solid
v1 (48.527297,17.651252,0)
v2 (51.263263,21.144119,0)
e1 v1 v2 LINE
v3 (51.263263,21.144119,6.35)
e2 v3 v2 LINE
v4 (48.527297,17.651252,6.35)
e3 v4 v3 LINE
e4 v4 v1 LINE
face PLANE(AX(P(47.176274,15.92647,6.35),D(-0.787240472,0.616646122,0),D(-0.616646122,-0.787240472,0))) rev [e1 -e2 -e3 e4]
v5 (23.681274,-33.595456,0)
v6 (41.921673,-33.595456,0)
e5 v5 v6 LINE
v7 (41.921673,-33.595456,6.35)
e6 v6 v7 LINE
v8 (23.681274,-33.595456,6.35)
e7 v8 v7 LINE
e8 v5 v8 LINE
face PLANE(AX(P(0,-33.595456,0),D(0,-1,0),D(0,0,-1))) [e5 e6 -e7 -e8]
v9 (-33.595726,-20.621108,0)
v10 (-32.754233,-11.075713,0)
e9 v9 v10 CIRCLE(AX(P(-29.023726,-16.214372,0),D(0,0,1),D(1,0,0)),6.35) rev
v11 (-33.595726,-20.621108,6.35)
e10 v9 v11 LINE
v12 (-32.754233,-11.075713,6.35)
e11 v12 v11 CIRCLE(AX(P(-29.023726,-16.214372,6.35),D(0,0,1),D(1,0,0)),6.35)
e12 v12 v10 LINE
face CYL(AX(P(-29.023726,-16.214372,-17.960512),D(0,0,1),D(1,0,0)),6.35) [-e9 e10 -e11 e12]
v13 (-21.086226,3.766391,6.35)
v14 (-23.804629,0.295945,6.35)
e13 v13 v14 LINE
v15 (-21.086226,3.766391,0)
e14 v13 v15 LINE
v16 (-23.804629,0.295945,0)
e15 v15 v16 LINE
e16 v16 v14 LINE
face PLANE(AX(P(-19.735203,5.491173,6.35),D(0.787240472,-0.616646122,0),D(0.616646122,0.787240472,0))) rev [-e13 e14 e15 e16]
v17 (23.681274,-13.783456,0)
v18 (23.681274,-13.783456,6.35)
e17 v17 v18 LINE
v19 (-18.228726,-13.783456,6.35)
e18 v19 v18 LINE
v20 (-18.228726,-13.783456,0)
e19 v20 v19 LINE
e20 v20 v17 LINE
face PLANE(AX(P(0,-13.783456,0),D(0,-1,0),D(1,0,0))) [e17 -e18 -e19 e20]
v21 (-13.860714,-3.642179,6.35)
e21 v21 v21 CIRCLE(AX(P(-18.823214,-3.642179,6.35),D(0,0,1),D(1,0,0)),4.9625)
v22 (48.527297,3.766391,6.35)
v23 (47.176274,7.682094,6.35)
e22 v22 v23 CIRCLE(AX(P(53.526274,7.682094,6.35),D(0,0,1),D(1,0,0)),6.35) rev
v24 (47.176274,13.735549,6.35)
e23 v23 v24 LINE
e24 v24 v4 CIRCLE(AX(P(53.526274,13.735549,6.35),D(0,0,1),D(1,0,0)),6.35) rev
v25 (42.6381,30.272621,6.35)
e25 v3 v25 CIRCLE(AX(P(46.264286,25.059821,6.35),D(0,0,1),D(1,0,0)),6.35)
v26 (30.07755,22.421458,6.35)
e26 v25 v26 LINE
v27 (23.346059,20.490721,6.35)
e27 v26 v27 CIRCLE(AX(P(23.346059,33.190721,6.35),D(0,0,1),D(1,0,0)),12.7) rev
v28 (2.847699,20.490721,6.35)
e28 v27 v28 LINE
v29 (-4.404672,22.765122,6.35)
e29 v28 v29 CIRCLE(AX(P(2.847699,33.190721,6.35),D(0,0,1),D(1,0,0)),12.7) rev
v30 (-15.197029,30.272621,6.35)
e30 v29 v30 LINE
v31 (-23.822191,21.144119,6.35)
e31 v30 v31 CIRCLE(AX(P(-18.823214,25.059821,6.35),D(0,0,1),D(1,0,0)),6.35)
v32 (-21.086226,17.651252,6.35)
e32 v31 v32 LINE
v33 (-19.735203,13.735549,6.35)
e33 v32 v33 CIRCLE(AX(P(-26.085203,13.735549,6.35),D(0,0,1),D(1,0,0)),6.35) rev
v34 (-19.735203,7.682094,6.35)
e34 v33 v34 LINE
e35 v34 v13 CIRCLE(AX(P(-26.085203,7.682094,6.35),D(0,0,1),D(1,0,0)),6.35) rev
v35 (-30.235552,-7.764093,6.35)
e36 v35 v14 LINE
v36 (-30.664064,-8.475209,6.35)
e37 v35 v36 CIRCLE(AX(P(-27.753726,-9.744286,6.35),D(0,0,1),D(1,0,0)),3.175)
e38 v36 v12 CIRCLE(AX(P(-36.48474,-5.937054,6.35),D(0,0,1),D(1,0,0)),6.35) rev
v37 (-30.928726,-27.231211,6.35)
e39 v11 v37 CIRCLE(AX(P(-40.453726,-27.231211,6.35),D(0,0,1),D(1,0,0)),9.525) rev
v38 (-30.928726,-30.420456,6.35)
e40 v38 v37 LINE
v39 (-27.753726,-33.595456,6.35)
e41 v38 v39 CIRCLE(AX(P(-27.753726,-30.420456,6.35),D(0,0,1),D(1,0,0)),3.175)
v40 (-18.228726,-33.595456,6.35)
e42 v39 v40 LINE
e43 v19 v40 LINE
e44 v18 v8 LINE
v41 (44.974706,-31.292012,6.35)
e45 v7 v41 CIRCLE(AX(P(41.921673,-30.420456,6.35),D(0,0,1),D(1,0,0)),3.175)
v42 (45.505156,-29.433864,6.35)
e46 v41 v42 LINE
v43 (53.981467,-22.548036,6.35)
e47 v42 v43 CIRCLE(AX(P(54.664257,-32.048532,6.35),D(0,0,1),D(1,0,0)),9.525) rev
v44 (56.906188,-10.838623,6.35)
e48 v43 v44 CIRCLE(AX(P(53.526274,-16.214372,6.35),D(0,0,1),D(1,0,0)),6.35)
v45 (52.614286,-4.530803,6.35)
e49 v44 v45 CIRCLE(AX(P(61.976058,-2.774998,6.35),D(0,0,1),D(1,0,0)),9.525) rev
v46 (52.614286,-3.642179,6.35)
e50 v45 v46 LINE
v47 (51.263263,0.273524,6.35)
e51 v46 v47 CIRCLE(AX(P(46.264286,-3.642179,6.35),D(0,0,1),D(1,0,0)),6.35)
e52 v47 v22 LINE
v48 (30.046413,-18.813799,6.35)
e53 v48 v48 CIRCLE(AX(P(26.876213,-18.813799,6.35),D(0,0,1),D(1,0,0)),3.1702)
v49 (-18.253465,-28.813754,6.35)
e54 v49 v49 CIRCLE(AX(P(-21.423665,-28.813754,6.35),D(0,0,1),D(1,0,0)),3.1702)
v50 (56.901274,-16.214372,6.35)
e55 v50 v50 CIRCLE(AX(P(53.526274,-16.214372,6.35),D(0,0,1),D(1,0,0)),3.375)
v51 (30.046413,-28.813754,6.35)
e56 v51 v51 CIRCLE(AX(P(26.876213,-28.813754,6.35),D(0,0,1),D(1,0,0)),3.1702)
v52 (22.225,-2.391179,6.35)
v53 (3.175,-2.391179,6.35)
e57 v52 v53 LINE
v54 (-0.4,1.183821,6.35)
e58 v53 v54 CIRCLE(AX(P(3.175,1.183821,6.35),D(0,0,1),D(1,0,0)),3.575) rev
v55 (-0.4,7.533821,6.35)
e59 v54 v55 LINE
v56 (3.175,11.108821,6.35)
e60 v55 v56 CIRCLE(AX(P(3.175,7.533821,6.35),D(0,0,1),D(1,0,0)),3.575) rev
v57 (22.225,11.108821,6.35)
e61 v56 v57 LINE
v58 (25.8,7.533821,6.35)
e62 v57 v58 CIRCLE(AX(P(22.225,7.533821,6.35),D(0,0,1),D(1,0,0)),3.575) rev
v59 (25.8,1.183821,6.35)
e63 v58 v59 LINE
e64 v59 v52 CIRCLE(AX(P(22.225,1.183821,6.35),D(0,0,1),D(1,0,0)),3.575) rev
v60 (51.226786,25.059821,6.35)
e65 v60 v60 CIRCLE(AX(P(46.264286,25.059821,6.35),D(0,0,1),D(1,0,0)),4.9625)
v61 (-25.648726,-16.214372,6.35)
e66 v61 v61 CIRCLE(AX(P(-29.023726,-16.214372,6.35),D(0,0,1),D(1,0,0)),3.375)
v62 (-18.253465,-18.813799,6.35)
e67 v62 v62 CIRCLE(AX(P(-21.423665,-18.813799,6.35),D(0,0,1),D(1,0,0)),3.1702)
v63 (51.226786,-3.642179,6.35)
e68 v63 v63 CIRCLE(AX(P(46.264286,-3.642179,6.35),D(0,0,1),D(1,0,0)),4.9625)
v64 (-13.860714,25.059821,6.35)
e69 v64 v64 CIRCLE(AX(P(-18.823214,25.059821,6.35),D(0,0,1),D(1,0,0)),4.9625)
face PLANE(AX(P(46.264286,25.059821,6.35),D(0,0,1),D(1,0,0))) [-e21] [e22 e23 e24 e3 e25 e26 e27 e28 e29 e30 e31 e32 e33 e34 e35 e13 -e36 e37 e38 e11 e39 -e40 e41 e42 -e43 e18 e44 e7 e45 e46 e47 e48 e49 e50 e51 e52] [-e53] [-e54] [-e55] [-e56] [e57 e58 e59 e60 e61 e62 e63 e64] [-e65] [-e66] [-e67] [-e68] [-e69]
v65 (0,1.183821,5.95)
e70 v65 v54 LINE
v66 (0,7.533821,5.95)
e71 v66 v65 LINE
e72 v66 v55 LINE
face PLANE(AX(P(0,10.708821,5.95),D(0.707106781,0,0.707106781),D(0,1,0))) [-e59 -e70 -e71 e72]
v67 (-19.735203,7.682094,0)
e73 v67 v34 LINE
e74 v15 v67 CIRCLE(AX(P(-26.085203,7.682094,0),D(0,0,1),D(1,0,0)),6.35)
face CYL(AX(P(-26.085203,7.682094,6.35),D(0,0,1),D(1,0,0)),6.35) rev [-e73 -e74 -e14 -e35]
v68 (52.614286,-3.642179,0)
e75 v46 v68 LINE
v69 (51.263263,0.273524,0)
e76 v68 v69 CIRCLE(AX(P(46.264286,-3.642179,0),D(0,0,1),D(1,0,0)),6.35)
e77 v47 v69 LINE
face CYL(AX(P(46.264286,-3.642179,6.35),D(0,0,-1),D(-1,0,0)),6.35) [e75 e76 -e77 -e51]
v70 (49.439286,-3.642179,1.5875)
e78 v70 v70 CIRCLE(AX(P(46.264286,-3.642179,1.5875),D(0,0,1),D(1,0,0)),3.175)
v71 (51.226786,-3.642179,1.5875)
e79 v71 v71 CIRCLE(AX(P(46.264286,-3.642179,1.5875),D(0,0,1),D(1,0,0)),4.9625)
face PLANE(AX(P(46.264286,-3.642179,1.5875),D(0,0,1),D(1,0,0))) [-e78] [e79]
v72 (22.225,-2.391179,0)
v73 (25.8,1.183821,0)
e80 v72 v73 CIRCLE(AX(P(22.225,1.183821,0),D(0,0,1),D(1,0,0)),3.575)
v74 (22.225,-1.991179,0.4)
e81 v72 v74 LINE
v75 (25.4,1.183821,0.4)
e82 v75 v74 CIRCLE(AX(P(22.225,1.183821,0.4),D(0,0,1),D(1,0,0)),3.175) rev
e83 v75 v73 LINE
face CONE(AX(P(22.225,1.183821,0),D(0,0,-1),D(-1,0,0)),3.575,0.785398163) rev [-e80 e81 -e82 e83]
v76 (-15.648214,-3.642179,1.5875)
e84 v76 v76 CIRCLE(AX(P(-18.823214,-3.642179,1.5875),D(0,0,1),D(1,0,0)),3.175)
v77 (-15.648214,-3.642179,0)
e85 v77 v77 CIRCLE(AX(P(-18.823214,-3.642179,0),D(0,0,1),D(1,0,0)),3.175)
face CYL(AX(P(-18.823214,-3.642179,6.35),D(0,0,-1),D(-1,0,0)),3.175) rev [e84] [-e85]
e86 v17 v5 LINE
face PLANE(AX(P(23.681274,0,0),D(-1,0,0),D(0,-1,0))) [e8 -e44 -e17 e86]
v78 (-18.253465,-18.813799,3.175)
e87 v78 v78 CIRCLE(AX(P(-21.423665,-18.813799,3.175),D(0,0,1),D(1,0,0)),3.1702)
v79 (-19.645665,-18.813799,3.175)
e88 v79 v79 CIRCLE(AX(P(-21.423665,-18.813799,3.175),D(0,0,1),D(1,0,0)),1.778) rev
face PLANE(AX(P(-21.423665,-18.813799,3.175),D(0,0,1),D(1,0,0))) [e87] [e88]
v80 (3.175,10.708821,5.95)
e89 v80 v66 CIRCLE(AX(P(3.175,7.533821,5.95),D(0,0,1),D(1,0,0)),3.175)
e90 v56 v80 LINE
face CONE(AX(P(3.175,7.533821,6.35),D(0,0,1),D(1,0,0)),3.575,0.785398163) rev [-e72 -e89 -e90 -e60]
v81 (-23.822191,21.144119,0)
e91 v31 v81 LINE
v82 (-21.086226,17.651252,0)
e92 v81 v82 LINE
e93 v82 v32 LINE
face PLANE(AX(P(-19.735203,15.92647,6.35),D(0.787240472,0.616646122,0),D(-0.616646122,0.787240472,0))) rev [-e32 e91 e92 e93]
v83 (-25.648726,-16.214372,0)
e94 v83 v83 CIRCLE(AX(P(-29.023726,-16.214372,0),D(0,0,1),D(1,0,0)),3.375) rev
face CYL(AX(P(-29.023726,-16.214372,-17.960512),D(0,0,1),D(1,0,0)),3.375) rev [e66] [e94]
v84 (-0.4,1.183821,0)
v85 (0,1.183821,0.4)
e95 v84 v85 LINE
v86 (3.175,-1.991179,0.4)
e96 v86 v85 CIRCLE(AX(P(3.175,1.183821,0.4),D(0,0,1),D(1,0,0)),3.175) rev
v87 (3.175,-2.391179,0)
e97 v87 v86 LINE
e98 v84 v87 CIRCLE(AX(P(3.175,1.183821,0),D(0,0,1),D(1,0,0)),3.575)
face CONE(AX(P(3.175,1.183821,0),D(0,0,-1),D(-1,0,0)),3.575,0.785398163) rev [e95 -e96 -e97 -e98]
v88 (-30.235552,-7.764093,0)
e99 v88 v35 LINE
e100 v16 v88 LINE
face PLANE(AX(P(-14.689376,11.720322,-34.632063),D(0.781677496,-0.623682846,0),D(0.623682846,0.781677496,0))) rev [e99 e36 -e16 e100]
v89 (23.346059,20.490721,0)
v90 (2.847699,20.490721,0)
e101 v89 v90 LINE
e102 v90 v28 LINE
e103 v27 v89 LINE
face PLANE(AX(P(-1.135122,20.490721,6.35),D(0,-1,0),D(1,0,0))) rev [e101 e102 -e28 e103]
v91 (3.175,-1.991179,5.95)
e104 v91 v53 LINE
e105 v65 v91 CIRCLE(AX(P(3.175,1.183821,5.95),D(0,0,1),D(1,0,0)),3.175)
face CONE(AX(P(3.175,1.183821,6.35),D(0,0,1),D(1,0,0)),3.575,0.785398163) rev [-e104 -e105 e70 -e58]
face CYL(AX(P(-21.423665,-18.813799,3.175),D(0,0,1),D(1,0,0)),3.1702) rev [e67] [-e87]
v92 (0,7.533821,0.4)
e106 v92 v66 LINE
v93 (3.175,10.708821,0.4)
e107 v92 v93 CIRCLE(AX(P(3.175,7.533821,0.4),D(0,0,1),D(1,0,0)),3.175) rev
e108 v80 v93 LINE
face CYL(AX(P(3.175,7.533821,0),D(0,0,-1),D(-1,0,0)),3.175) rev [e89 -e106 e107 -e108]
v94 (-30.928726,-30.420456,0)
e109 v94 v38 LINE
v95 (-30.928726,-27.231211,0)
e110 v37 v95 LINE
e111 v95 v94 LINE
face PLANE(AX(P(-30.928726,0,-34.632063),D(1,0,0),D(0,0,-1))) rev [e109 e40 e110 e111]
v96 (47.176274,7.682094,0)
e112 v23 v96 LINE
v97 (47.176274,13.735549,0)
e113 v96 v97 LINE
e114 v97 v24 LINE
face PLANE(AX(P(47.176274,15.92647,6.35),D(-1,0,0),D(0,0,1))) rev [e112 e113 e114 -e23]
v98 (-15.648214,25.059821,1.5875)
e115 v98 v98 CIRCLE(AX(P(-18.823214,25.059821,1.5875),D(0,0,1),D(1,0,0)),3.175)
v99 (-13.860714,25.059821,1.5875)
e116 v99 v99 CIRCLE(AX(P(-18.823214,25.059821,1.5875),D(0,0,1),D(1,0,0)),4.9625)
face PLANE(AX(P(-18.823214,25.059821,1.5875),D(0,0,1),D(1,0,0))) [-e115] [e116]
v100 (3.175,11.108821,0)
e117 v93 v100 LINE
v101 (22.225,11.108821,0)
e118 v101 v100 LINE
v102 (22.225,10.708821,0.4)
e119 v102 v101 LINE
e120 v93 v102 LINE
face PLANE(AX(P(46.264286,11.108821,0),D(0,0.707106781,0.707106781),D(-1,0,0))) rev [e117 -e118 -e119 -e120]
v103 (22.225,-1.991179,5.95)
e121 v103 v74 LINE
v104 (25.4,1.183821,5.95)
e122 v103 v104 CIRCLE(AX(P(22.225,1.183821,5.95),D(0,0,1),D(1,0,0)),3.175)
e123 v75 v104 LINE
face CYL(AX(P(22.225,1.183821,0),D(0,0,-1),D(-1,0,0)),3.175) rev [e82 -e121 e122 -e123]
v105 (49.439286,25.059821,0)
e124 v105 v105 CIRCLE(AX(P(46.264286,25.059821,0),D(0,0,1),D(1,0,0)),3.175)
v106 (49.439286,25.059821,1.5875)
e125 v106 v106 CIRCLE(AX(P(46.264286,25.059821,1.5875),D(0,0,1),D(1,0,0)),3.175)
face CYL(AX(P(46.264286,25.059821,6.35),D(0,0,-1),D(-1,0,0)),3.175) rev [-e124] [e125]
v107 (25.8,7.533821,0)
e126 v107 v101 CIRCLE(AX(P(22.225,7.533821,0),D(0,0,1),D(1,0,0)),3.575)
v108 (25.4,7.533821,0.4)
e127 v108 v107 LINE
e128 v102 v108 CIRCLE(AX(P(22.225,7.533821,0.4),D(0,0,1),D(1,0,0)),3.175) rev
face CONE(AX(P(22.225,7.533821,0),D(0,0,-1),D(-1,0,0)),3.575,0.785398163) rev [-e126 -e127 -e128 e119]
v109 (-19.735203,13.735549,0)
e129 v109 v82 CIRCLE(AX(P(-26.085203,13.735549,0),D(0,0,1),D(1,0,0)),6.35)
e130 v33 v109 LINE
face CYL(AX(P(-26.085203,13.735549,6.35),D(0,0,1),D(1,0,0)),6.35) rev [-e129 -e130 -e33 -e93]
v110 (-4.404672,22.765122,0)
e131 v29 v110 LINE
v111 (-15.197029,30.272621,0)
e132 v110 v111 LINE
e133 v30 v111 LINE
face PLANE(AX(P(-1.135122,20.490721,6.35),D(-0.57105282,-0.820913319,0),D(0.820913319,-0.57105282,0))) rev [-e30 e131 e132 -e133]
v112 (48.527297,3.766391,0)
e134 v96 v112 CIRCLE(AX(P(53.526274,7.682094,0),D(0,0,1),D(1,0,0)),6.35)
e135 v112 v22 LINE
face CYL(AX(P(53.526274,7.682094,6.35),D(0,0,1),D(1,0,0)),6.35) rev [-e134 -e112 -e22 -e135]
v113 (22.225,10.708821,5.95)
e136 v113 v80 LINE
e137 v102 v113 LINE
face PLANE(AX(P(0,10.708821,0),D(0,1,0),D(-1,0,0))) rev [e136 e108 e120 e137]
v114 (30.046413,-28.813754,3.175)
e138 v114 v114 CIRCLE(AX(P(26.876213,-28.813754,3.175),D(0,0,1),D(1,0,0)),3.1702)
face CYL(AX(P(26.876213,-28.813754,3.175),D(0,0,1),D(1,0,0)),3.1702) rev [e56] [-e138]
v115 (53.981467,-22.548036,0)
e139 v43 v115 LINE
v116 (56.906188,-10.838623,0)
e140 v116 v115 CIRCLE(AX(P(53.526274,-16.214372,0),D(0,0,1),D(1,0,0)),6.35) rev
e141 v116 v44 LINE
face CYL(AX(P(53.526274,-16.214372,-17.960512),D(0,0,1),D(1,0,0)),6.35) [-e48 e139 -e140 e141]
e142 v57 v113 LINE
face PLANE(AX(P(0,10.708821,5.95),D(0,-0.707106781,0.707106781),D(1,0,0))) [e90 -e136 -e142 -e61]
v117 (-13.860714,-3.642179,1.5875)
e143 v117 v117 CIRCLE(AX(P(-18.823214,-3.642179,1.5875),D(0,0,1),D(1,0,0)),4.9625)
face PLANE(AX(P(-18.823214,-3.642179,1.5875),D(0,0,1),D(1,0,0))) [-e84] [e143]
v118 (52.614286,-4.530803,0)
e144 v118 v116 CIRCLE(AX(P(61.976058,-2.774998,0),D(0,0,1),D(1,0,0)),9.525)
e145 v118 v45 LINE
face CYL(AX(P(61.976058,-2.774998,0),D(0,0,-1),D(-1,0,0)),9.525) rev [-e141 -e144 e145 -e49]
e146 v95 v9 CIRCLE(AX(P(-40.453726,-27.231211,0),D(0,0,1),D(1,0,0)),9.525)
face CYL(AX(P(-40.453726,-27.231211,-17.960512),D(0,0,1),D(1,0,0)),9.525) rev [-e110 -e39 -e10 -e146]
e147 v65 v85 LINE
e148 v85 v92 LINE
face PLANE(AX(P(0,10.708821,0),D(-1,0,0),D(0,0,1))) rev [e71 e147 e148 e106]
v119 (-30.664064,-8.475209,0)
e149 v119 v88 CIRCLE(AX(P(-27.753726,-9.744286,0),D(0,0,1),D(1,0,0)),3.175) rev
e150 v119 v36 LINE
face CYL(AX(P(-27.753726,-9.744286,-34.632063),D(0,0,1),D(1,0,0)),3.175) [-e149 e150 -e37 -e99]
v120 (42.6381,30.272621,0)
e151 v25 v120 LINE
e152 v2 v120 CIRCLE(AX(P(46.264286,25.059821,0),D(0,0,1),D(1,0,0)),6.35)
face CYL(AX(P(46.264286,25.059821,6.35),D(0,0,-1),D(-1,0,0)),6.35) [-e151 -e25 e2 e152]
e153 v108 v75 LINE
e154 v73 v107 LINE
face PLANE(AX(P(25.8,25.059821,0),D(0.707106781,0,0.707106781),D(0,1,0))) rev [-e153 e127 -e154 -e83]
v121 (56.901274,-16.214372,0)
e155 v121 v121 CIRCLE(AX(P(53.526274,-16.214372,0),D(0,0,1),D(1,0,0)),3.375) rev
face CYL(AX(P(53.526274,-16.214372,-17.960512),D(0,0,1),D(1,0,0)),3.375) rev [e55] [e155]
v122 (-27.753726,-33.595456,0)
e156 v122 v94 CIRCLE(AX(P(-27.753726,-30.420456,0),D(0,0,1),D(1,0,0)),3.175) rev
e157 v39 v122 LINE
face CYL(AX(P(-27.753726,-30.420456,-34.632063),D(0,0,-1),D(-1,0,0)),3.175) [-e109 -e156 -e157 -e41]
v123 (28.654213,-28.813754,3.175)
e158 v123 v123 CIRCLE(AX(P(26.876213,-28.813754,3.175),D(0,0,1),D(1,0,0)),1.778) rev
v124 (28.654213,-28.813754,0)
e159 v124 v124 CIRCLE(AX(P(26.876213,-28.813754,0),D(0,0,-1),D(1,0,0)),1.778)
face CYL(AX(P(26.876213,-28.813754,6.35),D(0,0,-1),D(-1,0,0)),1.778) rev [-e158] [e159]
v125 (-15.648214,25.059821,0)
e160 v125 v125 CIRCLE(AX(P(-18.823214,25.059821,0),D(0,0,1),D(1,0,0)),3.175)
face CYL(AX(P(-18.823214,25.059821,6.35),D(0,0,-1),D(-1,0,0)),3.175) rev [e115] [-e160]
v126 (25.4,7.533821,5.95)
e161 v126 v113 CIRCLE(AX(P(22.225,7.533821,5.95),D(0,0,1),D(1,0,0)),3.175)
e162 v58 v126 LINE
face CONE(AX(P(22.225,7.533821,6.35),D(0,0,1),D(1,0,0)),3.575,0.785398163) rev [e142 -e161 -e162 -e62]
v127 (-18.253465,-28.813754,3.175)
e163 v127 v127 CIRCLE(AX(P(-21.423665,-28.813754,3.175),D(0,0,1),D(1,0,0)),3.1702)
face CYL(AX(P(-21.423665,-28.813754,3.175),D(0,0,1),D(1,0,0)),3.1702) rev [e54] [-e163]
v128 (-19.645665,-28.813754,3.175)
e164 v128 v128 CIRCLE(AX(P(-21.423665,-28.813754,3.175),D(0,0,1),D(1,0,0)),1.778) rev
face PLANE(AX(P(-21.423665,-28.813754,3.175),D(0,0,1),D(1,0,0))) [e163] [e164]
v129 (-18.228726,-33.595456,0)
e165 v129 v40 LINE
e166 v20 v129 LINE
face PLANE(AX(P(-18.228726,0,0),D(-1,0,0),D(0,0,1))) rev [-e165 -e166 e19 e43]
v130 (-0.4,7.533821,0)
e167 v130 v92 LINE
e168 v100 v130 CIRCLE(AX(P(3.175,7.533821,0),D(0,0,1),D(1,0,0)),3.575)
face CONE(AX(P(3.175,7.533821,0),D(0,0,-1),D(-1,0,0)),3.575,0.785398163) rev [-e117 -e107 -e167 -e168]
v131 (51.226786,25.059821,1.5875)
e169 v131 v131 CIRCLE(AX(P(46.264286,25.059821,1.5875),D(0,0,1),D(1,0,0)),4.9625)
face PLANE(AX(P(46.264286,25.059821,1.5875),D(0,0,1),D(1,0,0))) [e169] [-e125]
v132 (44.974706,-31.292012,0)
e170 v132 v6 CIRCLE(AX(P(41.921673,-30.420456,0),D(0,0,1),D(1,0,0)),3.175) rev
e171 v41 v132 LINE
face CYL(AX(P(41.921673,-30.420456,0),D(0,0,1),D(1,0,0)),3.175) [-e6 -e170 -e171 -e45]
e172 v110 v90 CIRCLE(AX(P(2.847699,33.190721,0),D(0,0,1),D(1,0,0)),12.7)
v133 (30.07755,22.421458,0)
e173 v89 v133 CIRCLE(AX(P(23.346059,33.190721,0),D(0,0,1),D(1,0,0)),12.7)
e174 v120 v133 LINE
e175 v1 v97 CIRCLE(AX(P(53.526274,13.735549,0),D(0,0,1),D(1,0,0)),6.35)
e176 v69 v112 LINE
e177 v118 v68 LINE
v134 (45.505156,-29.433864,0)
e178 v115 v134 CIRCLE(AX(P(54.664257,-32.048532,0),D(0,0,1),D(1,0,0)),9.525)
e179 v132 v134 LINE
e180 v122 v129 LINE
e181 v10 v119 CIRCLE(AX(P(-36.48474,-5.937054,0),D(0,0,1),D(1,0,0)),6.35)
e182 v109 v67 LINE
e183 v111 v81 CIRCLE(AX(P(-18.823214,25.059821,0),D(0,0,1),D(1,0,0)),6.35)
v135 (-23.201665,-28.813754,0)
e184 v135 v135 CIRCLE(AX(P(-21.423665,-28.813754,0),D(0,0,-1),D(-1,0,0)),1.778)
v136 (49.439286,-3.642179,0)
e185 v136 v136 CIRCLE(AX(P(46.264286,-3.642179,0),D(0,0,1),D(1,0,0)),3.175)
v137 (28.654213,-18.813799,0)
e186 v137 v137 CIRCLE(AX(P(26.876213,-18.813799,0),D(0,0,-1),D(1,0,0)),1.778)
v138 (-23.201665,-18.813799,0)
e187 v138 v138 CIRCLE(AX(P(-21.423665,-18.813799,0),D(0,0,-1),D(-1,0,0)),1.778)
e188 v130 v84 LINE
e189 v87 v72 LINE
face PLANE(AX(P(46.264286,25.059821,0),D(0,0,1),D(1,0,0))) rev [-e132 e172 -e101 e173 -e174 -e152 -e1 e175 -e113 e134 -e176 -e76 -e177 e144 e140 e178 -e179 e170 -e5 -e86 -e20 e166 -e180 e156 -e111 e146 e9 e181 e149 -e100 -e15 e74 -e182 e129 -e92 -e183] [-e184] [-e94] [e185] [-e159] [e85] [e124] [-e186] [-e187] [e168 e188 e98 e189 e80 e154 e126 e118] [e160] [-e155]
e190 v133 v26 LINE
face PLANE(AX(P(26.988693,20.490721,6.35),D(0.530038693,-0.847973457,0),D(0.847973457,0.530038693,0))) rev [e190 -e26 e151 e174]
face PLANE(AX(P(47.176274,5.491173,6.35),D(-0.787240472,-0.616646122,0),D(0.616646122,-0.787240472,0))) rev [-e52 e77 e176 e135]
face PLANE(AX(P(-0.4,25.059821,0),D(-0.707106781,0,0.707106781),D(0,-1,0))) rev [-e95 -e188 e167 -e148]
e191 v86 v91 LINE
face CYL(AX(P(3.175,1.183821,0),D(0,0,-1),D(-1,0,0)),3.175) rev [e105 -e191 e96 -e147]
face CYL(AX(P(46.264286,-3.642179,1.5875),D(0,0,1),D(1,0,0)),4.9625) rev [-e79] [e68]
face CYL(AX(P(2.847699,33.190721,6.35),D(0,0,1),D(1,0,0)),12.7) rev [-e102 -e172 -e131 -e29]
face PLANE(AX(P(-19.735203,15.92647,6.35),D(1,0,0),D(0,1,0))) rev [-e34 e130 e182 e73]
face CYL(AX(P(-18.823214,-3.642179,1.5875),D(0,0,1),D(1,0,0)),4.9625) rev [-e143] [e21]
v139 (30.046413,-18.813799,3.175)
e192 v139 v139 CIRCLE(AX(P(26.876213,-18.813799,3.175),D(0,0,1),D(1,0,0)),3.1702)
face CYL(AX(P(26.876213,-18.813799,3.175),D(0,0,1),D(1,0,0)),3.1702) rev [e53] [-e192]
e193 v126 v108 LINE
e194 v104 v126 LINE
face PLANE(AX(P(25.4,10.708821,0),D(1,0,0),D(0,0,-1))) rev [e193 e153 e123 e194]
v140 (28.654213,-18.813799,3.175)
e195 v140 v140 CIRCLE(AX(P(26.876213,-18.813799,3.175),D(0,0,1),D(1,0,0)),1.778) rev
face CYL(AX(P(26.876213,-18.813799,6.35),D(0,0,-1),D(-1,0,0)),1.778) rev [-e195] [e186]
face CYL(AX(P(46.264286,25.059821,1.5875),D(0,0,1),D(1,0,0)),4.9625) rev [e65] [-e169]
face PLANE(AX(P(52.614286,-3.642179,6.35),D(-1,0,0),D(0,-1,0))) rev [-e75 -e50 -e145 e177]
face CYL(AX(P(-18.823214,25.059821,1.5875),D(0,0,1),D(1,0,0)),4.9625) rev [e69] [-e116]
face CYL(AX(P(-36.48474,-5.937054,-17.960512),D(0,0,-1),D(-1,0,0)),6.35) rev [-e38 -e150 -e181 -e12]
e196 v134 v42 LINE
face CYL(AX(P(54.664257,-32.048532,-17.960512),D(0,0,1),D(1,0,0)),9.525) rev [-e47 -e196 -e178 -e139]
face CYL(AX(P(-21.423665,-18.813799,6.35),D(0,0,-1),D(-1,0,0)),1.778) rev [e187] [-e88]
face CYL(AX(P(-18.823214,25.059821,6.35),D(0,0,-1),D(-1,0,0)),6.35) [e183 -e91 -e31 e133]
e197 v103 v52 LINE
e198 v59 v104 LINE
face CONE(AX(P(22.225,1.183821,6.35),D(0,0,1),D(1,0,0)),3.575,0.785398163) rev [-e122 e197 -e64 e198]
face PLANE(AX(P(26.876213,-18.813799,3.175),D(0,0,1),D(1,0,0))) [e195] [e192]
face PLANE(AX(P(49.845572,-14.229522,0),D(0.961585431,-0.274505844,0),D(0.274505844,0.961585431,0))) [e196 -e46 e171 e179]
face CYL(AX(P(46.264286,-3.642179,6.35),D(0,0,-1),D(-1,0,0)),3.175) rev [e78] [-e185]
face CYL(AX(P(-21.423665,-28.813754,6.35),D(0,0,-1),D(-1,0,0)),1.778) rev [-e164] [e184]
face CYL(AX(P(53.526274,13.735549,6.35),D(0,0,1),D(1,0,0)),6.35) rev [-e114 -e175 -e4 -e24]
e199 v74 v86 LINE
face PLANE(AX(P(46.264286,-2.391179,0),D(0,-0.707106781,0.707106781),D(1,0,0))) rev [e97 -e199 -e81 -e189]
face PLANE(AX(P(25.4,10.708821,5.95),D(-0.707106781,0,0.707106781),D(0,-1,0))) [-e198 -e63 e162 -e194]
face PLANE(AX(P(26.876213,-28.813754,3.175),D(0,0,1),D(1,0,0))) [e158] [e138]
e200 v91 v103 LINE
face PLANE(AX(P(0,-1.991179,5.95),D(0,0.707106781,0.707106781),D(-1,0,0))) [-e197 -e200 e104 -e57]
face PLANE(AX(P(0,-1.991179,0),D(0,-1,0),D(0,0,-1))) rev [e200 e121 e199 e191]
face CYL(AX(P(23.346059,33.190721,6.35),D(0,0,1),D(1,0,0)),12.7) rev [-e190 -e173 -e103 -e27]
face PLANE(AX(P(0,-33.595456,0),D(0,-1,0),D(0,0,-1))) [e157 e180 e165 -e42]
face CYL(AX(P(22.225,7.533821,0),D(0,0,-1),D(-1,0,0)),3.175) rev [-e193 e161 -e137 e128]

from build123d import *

# Parameters (mm, degrees)
SKETCH1_R           = 3.175
BOSS_EXTRUDE1_DEPTH = 6.35
FILLET1_R           = 6.35
FILLET2_R           = 12.7
SKETCH2_R           = 4.9625
CUT_EXTRUDE1_DEPTH  = 4.7625
SKETCH5_R           = 1.778
CUT_EXTRUDE3_DEPTH  = 66.013999766
CUT_EXTRUDE15_DEPTH = 66.013999766
SKETCH11_R          = 3.1702
CUT_EXTRUDE16_DEPTH = 3.175
BOSS_EXTRUDE2_START = -6.35
BOSS_EXTRUDE2_DEPTH = 6.35
SKETCH12_W          = 25.4
SKETCH12_H          = 12.7
CUT_EXTRUDE17_DEPTH = 63.747431864
FILLET14_R          = 3.175
CHAMFER4_SIZE       = 0.4
FILLET16_R          = 3.175
FILLET17_R          = 3.175
SKETCH16_R          = 3.375
BOSS_EXTRUDE4_DEPTH = 6.35
SKETCH17_R          = 3.375
CUT_EXTRUDE19_DEPTH = 69.950310788
FILLET19_R          = 6.35
FILLET20_R          = 9.525


with BuildPart() as part:
    # Sketch1 → Boss-Extrude1 (new body)
    with BuildSketch(Plane.XY):
        with BuildLine():
            Line((-19.735202783, 15.926469991), (-23.822191281, 21.144118554))
            ThreePointArc((-23.822191281, 21.144118554), (-23.438788835, 29.420896018), (-15.197028879, 30.272621002))
            Line((-15.197028879, 30.272621002), (-1.135121582, 20.490721215))
            Line((-1.135121582, 20.490721215), (26.988693011, 20.490721215))
            Line((26.988693011, 20.490721215), (42.638100307, 30.272621002))
            ThreePointArc((42.638100307, 30.272621002), (50.879860264, 29.420896018), (51.263262709, 21.144118554))
            Line((51.263262709, 21.144118554), (47.176274212, 15.926469991))
            Line((47.176274212, 15.926469991), (47.176274212, 5.491172866))
            Line((47.176274212, 5.491172866), (51.263262709, 0.273524304))
            ThreePointArc((51.263262709, 0.273524304), (52.267035248, -1.571068231), (52.614285714, -3.642178571))
            Line((52.614285714, -3.642178571), (52.614285714, -37.65945571))
            Line((52.614285714, -37.65945571), (-25.173214286, -37.65945571))
            Line((-25.173214286, -37.65945571), (-25.173214286, -3.642178571))
            ThreePointArc((-25.173214286, -3.642178571), (-24.825963819, -1.571068231), (-23.822191281, 0.273524304))
            Line((-23.822191281, 0.273524304), (-19.735202783, 5.491172866))
            Line((-19.735202783, 5.491172866), (-19.735202783, 15.926469991))
        make_face()
        with Locations((-18.823214286, 25.059821429)):
            Circle(SKETCH1_R, mode=Mode.SUBTRACT)
        with Locations((46.264285714, 25.059821429)):
            Circle(SKETCH1_R, mode=Mode.SUBTRACT)
        with Locations((46.264285714, -3.642178571)):
            Circle(SKETCH1_R, mode=Mode.SUBTRACT)
        with Locations((-18.823214286, -3.642178571)):
            Circle(SKETCH1_R, mode=Mode.SUBTRACT)
    extrude(amount=BOSS_EXTRUDE1_DEPTH)

    # Fillet1
    fillet1_edges = [part.edges().sort_by_distance(p)[0] for p in [
        (47.176274212, 15.926469991, 3.175),
        (47.176274212, 5.491172866, 3.175),
        (-19.735202783, 5.491172866, 3.175),
        (-19.735202783, 15.926469991, 3.175),
    ]]
    fillet(fillet1_edges, radius=FILLET1_R)

    # Fillet2
    fillet2_edges = [part.edges().sort_by_distance(p)[0] for p in [
        (-1.135121582, 20.490721215, 3.175),
        (26.988693011, 20.490721215, 3.175),
    ]]
    fillet(fillet2_edges, radius=FILLET2_R)

    # Sketch2 → Cut-Extrude1 (cut)
    with BuildSketch(Plane.XY.offset(6.35)):
        with Locations((-18.823214286, 25.059821429)):
            Circle(SKETCH2_R)
        with Locations((-18.823214286, -3.642178571)):
            Circle(SKETCH2_R)
        with Locations((46.264285714, -3.642178571)):
            Circle(SKETCH2_R)
        with Locations((46.264285714, 25.059821429)):
            Circle(SKETCH2_R)
    extrude(amount=-CUT_EXTRUDE1_DEPTH, mode=Mode.SUBTRACT)

    # Sketch5 → Cut-Extrude3 (cut, through all)
    with BuildSketch(Plane(origin=(0, 0, 0), x_dir=(-1, 0, 0), z_dir=(0, 0, -1))):
        with Locations((21.423664788, -18.813799362)):
            Circle(SKETCH5_R)
        with Locations((21.423664788, -28.813754296)):
            Circle(SKETCH5_R)
        with Locations(Location((-26.876213212, -28.813754296, 0), (0, 0, 180))):
            Circle(SKETCH5_R)
        with Locations(Location((-26.876213212, -18.813799362, 0), (0, 0, 180))):
            Circle(SKETCH5_R)
    extrude(amount=-CUT_EXTRUDE3_DEPTH, mode=Mode.SUBTRACT)

    # Sketch6 → Cut-Extrude15 (cut, through all)
    with BuildSketch(Plane.XY.offset(6.35)):
        Polygon((-18.228725788, -33.59545571), (-25.173214286, -33.59545571), (-25.173214286, -37.65945571), (-17.553214286, -37.65945571), (-8.028214286, -37.65945571), (33.881785714, -37.65945571), (43.406785714, -37.65945571), (51.026785714, -37.65945571), (52.614285714, -37.65945571), (52.614285714, -4.530802681), (52.3703532, -5.385290691), (44.317137236, -33.59545571), (23.681274212, -33.59545571), (23.681274212, -13.78345571), (-18.228725788, -13.78345571), align=None)
    extrude(amount=-CUT_EXTRUDE15_DEPTH, mode=Mode.SUBTRACT)

    # Sketch11 → Cut-Extrude16 (cut)
    with BuildSketch(Plane.XY.offset(6.35)):
        with Locations((-21.423664788, -18.813799362)):
            Circle(SKETCH11_R)
        with Locations((-21.423664788, -28.813754296)):
            Circle(SKETCH11_R)
        with Locations((26.876213212, -28.813754296)):
            Circle(SKETCH11_R)
        with Locations((26.876213212, -18.813799362)):
            Circle(SKETCH11_R)
    extrude(amount=-CUT_EXTRUDE16_DEPTH, mode=Mode.SUBTRACT)

    # Sketch13 → Boss-Extrude2 (add)
    with BuildSketch(Plane.XY.offset(6.35).offset(BOSS_EXTRUDE2_START)):
        with BuildLine():
            Line((-30.928725788, -33.59545571), (-25.173214286, -33.59545571))
            Line((-25.173214286, -33.59545571), (-25.173214286, -3.642178571))
            ThreePointArc((-25.173214286, -3.642178571), (-24.825963819, -1.571068231), (-23.822191281, 0.273524304))
            Line((-23.822191281, 0.273524304), (-23.804629036, 0.295945121))
            Line((-23.804629036, 0.295945121), (-30.928725788, -8.632865637))
            Line((-30.928725788, -8.632865637), (-30.928725788, -33.59545571))
        make_face()
    extrude(amount=BOSS_EXTRUDE2_DEPTH)

    # Sketch12 → Cut-Extrude17 (cut, through all)
    with BuildSketch(Plane.XY.offset(6.35)):
        with Locations((12.7, 4.358821429)):
            Rectangle(SKETCH12_W, SKETCH12_H)
    extrude(amount=-CUT_EXTRUDE17_DEPTH, mode=Mode.SUBTRACT)

    # Fillet14
    fillet14_edges = [part.edges().sort_by_distance(p)[0] for p in [
        (0, -1.991178571, 3.175),
        (0, 10.708821429, 3.175),
        (25.4, 10.708821429, 3.175),
        (25.4, -1.991178571, 3.175),
    ]]
    fillet(fillet14_edges, radius=FILLET14_R)

    # Chamfer4
    chamfer4_edges = [part.edges().sort_by_distance(p)[0] for p in [
        (12.7, 10.708821429, 6.35),
        (12.7, 10.708821429, 0),
        (25.4, 4.358821429, 6.35),
        (25.4, 4.358821429, 0),
        (0, 4.358821429, 6.35),
        (0, 4.358821429, 0),
        (12.7, -1.991178571, 6.35),
        (12.7, -1.991178571, 0),
        (24.47006403, 9.778885459, 6.35),
        (24.47006403, 9.778885459, 0),
        (0.92993597, 9.778885459, 6.35),
        (0.92993597, 9.778885459, 0),
        (0.92993597, -1.061242602, 6.35),
        (0.92993597, -1.061242602, 0),
        (24.47006403, -1.061242602, 6.35),
        (24.47006403, -1.061242602, 0),
    ]]
    chamfer(chamfer4_edges, length=CHAMFER4_SIZE)

    # Fillet16
    fillet16_edges = [part.edges().sort_by_distance(p)[0] for p in [
        (-30.928725788, -33.59545571, 3.175),
        (-30.928725788, -8.632865637, 3.175),
    ]]
    fillet(fillet16_edges, radius=FILLET16_R)

    # Fillet17
    fillet17_edges = [part.edges().sort_by_distance(p)[0] for p in [
        (44.317137236, -33.59545571, 3.175),
    ]]
    fillet(fillet17_edges, radius=FILLET17_R)

    # Sketch16 → Boss-Extrude4 (add)
    # profile 1 of 2: a face of its own
    with BuildSketch(Plane.XY.offset(6.35)):
        with BuildLine():
            Line((53.526274212, -9.864372385), (51.091700197, -9.864372385))
            Line((51.091700197, -9.864372385), (50.933736593, -10.417713977))
            ThreePointArc((50.933736593, -10.417713977), (47.420206722, -14.471260278), (48.26426853, -19.768777567))
            Line((48.26426853, -19.768777567), (47.466204116, -22.564372385))
            Line((47.466204116, -22.564372385), (53.526274212, -22.564372385))
            ThreePointArc((53.526274212, -22.564372385), (59.876274212, -16.214372385), (53.526274212, -9.864372385))
        make_face()
        with Locations((53.526274212, -16.214372385)):
            Circle(SKETCH16_R, mode=Mode.SUBTRACT)
    # profile 2 of 2: a face of its own
    with BuildSketch(Plane.XY.offset(6.35)):
        with BuildLine():
            ThreePointArc((-22.681328216, -15.903739098), (-35.032010869, -14.159375941), (-24.200053563, -20.344104369))
            ThreePointArc((-24.200053563, -20.344104369), (-24.423265633, -17.787854523), (-22.681328216, -15.903739098))
        make_face()
        with Locations((-29.023725788, -16.214372385)):
            Circle(SKETCH16_R, mode=Mode.SUBTRACT)
    extrude(amount=-BOSS_EXTRUDE4_DEPTH)

    # Sketch17 → Cut-Extrude19 (cut, through all)
    with BuildSketch(Plane.XY.offset(6.35)):
        with Locations((-29.023725788, -16.214372385)):
            Circle(SKETCH17_R)
    extrude(amount=-CUT_EXTRUDE19_DEPTH, mode=Mode.SUBTRACT)

    # Fillet19
    fillet19_edges = [part.edges().sort_by_distance(p)[0] for p in [
        (-30.928725788, -10.156858456, 3.175),
    ]]
    fillet(fillet19_edges, radius=FILLET19_R)

    # Fillet20
    # the kernel refuses this fillet: 9.525 mm, written as the material it adds along each edge
    with BuildSketch(Plane(origin=(47.466204116, -22.564372385, 6.35), x_dir=(-0.2745058436063301, -0.9615854313715329, 0), z_dir=(0, 0, -1))) as fillet20_piece_1:
        with BuildLine():
            CenterArc((7.143922461, -9.525), FILLET20_R, 90, 69.956718792)
            Line((-1.804186302, -6.260497806), (-2.698997178, -5.934047587))
            ThreePointArc((-2.698997178, -5.934047587), (-2.579434777, -5.565808302), (-0.915910123, 0.261466816))
            Line((-0.915910123, 0.261466816), (0, 0.9525))
            Line((0, 0.9525), (7.143922461, 0.9525))
            Line((7.143922461, 0.9525), (7.143922461, 0))
        make_face()
    extrude(amount=6.35)
    with BuildSketch(Plane(origin=(51.091700197, -9.864372385, 6.35), x_dir=(0.9862513766941969, -0.1652519953549774, 0), z_dir=(0, 0, -1))) as fillet20_piece_2:
        with BuildLine():
            CenterArc((9.56317932, -8.790567042), FILLET20_R, 112.647072848, 47.218605044)
            Line((0.620269026, -5.511850758), (-0.274022003, -5.18397913))
            ThreePointArc((-0.274022003, -5.18397913), (-0.63639102, -2.862441411), (-0.946525533, -0.106516032))
            Line((-0.946525533, -0.106516032), (0.157402526, 0.939404436))
            ThreePointArc((0.157402526, 0.939404436), (2.558504499, 0.537086223), (5.528779384, 0.879056704))
            Line((5.528779384, 0.879056704), (5.895543014, 0))
        make_face()
    extrude(amount=6.35)
    with BuildSketch(Plane(origin=(-30.928725788, -22.271886314, 0), x_dir=(-0.8502967315537753, 0.5263035894889632, 0), z_dir=(0, 0, 1))) as fillet20_piece_3:
        with BuildLine():
            CenterArc((5.488966177, 9.22993895), FILLET20_R, 211.756041781, 43.945519562)
            Line((-2.610110191, 4.21689726), (-2.772091718, 4.116636426))
            Line((-2.772091718, 4.116636426), (-0.161981527, -0.100260834))
            Line((-0.161981527, -0.100260834), (0.047048282, -0.184598779))
            ThreePointArc((0.047048282, -0.184598779), (1.568276051, 0.006207367), (3.08950382, -0.184598779))
            Line((3.08950382, -0.184598779), (3.136552101, 0))
        make_face()
    extrude(amount=6.35)


solid = part.part
